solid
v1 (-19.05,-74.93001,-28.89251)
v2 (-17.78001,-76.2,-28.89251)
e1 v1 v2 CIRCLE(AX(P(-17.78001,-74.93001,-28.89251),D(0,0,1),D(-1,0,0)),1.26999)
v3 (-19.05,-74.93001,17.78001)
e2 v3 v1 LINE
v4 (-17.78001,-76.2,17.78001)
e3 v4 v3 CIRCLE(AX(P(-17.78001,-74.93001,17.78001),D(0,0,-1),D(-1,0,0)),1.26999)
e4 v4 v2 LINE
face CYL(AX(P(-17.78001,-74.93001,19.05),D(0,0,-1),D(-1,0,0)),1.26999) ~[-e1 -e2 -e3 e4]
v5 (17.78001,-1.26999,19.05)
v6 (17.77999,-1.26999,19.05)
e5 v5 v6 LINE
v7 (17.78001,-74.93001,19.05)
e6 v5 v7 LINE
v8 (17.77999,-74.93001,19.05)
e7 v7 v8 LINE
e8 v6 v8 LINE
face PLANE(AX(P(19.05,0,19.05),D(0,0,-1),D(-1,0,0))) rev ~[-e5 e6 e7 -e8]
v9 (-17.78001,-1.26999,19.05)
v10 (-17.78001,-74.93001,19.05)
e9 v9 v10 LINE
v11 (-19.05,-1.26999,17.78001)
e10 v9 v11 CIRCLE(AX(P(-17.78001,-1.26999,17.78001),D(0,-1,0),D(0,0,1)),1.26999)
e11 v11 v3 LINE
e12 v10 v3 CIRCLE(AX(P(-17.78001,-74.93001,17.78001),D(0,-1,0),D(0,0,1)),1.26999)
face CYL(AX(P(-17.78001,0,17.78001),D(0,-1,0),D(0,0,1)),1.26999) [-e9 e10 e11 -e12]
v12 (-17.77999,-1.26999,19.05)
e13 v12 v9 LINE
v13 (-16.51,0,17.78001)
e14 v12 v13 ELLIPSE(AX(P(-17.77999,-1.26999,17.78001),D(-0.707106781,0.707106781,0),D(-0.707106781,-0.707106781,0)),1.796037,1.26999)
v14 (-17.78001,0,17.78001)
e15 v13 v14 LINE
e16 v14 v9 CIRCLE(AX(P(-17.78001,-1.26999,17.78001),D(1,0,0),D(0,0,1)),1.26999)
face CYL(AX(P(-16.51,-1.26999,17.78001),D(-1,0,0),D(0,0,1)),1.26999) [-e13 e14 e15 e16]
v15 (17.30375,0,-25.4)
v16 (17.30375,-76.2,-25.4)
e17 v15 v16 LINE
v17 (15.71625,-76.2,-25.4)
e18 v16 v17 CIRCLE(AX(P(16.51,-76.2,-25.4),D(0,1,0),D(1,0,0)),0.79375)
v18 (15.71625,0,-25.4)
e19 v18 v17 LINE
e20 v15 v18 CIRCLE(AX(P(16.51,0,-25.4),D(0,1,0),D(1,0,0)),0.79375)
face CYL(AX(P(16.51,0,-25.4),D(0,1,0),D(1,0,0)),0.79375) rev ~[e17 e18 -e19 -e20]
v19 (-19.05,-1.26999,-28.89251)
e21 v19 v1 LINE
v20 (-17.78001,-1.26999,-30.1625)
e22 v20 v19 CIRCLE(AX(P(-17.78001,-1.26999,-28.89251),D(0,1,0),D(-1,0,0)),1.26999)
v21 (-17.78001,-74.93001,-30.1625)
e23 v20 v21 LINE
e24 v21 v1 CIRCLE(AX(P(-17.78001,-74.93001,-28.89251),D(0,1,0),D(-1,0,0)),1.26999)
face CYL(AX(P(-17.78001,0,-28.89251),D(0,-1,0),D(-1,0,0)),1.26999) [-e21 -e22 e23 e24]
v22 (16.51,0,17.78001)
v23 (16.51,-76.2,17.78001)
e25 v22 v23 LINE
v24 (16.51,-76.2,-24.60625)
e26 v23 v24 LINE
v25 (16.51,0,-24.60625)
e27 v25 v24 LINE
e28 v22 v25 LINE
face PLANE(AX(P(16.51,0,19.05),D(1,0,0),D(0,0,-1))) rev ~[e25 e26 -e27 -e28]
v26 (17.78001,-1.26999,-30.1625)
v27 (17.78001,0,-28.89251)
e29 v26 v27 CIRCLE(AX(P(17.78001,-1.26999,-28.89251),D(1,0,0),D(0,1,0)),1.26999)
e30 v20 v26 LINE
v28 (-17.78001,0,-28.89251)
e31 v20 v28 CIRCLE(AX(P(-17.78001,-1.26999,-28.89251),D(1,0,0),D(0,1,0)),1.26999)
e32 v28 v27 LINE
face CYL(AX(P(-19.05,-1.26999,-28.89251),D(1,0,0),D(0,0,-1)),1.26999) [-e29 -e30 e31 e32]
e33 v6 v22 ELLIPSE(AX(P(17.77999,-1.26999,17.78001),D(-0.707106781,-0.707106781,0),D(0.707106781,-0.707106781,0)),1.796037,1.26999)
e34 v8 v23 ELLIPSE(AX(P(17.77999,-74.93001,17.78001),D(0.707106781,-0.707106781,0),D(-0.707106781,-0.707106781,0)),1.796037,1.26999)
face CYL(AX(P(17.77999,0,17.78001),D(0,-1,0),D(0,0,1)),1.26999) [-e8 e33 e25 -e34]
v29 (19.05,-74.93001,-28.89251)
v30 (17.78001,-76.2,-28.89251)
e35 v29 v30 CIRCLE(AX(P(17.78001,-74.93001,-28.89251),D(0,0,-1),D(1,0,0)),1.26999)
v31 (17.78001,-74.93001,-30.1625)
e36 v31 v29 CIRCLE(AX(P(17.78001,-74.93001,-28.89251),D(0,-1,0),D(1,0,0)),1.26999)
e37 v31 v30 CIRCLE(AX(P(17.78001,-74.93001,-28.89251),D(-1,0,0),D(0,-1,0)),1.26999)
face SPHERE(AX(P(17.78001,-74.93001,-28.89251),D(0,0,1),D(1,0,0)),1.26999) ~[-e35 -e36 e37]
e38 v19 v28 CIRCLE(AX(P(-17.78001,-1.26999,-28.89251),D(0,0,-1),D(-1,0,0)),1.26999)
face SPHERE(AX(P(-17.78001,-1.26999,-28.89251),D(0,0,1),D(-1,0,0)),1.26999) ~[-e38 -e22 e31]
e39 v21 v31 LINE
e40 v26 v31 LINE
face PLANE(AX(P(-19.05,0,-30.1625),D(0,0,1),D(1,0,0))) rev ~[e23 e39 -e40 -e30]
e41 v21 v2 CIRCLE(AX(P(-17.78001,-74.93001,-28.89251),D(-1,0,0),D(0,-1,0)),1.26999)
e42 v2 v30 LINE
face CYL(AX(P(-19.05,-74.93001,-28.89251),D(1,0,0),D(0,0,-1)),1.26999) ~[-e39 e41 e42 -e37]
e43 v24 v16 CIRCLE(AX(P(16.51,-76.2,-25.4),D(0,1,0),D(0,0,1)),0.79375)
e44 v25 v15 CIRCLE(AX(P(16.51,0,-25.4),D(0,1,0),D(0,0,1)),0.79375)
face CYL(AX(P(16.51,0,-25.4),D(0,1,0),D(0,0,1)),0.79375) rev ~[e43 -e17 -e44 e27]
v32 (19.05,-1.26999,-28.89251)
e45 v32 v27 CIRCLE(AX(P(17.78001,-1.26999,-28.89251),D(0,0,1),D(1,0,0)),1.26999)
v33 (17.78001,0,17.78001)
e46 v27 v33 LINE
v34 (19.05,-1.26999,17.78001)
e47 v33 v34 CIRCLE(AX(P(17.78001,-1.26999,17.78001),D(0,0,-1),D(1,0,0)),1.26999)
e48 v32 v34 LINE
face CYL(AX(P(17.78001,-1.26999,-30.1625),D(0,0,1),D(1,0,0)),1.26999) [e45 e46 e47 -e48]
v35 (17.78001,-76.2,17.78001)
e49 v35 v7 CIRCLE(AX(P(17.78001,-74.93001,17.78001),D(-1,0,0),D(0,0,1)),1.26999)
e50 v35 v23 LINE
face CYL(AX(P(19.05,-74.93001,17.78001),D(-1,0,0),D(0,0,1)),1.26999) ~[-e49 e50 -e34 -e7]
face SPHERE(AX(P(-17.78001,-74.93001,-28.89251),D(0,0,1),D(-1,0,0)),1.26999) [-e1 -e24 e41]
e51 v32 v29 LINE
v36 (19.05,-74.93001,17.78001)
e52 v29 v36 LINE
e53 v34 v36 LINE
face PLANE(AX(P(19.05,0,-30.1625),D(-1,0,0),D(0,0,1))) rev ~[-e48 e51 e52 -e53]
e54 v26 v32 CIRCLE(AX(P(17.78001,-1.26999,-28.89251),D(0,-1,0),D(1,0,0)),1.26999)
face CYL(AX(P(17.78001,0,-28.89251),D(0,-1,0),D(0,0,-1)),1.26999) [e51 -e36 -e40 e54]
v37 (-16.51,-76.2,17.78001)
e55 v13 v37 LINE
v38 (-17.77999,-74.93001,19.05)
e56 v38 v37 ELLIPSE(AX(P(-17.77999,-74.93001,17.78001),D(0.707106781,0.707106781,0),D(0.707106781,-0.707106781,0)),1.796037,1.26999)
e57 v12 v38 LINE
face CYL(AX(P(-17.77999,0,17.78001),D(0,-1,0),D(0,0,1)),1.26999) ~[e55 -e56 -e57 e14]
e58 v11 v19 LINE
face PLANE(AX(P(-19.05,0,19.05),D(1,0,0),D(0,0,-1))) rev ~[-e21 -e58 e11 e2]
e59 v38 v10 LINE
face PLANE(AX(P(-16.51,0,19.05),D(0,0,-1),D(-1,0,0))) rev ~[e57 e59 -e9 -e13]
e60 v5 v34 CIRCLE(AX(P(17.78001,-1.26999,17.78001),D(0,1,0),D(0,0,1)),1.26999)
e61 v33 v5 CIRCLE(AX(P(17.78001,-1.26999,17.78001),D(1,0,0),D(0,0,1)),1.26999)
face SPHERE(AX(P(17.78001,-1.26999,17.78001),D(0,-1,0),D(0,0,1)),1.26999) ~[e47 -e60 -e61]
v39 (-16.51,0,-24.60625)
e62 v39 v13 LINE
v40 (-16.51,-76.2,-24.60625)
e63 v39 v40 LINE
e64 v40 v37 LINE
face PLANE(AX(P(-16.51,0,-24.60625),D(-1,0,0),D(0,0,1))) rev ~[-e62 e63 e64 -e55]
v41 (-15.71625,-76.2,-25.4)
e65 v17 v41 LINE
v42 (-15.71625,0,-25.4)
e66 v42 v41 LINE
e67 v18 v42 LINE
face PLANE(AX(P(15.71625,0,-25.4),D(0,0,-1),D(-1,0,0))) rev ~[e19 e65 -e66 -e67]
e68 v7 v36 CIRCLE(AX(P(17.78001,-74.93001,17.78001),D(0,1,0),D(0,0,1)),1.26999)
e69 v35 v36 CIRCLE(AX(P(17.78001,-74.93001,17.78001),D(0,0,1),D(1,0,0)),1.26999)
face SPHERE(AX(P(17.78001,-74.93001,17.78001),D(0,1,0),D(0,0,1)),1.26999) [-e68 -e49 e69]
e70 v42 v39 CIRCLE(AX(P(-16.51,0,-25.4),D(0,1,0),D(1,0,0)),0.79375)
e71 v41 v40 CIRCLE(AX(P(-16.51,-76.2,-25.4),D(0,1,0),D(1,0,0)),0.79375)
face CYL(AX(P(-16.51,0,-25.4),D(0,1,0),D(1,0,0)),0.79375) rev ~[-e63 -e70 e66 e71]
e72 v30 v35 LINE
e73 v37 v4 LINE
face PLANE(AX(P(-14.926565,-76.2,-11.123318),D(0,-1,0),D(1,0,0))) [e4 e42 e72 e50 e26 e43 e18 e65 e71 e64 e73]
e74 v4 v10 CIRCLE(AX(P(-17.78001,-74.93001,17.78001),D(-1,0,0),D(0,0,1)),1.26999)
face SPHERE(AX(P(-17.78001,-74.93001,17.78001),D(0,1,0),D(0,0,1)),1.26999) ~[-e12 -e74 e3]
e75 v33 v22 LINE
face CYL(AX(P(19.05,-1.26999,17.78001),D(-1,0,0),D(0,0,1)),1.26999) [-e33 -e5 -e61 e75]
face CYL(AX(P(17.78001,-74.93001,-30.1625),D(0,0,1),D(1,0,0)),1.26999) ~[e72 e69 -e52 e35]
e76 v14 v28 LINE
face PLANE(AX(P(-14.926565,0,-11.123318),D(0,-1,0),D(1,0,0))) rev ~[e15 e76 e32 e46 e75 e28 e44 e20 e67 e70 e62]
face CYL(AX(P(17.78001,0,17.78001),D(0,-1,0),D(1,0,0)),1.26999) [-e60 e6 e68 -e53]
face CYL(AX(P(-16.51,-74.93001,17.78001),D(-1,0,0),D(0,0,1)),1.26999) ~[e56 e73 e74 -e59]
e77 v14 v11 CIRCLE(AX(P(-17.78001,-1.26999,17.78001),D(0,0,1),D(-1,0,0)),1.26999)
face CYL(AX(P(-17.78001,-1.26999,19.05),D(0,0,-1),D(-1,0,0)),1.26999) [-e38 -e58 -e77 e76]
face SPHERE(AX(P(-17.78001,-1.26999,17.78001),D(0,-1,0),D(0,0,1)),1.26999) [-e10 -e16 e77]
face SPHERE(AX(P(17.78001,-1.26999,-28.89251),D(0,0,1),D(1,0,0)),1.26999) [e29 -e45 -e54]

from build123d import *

# Parameters (mm, degrees)
F1_DEPTH = 76.2
F2_R     = 1.26999


# Not quite as in the source:
# - a fillet or chamfer is up to 0.001 mm smaller than in the source, because OpenCascade refuses the exact size


with BuildPart() as f1:
    # F0 (on Front) → F1 (new body)
    with BuildSketch(Plane.XZ):
        with BuildLine():
            Line((-16.51, 19.05), (-19.05, 19.05))
            Line((-19.05, 19.05), (-19.05, -30.1625))
            Line((-19.05, -30.1625), (0, -30.1625))
            Line((0, -30.1625), (0, -25.4))
            Line((0, -25.4), (-15.71625, -25.4))
            ThreePointArc((-15.71625, -25.4), (-17.0712660076, -25.9612660076), (-16.51, -24.60625))
            Line((-16.51, -24.60625), (-16.51, 19.05))
        make_face()
        with BuildLine():
            Line((0, -25.4), (0, -30.1625))
            Line((0, -30.1625), (19.05, -30.1625))
            Line((19.05, -30.1625), (19.05, 19.05))
            Line((19.05, 19.05), (16.51, 19.05))
            Line((16.51, 19.05), (16.51, -24.60625))
            ThreePointArc((16.51, -24.60625), (17.0712660076, -24.8387339924), (17.30375, -25.4))
            ThreePointArc((17.30375, -25.4), (16.51, -26.19375), (15.71625, -25.4))
            Line((15.71625, -25.4), (0, -25.4))
        make_face()
    extrude(amount=F1_DEPTH)

    # F2 (radius 1.27 in the source; OpenCascade refuses exactly that, so slightly less here)
    f2_edges = [f1.edges().sort_by_distance(p)[0] for p in [
        (19.05, -38.1, 19.05),
        (16.51, -38.1, 19.05),
        (17.78, 0, 19.05),
        (17.78, -76.2, 19.05),
        (-16.51, -38.1, 19.05),
        (-19.05, -38.1, 19.05),
        (-17.78, 0, 19.05),
        (-17.78, -76.2, 19.05),
        (-19.05, -76.2, -5.55625),
        (19.05, -76.2, -5.55625),
        (19.05, 0, -5.55625),
        (-19.05, 0, -5.55625),
        (-19.05, -38.1, -30.1625),
        (19.05, -38.1, -30.1625),
        (0, 0, -30.1625),
        (0, -76.2, -30.1625),
    ]]
    fillet(f2_edges, radius=F2_R)


solid = f1.part
